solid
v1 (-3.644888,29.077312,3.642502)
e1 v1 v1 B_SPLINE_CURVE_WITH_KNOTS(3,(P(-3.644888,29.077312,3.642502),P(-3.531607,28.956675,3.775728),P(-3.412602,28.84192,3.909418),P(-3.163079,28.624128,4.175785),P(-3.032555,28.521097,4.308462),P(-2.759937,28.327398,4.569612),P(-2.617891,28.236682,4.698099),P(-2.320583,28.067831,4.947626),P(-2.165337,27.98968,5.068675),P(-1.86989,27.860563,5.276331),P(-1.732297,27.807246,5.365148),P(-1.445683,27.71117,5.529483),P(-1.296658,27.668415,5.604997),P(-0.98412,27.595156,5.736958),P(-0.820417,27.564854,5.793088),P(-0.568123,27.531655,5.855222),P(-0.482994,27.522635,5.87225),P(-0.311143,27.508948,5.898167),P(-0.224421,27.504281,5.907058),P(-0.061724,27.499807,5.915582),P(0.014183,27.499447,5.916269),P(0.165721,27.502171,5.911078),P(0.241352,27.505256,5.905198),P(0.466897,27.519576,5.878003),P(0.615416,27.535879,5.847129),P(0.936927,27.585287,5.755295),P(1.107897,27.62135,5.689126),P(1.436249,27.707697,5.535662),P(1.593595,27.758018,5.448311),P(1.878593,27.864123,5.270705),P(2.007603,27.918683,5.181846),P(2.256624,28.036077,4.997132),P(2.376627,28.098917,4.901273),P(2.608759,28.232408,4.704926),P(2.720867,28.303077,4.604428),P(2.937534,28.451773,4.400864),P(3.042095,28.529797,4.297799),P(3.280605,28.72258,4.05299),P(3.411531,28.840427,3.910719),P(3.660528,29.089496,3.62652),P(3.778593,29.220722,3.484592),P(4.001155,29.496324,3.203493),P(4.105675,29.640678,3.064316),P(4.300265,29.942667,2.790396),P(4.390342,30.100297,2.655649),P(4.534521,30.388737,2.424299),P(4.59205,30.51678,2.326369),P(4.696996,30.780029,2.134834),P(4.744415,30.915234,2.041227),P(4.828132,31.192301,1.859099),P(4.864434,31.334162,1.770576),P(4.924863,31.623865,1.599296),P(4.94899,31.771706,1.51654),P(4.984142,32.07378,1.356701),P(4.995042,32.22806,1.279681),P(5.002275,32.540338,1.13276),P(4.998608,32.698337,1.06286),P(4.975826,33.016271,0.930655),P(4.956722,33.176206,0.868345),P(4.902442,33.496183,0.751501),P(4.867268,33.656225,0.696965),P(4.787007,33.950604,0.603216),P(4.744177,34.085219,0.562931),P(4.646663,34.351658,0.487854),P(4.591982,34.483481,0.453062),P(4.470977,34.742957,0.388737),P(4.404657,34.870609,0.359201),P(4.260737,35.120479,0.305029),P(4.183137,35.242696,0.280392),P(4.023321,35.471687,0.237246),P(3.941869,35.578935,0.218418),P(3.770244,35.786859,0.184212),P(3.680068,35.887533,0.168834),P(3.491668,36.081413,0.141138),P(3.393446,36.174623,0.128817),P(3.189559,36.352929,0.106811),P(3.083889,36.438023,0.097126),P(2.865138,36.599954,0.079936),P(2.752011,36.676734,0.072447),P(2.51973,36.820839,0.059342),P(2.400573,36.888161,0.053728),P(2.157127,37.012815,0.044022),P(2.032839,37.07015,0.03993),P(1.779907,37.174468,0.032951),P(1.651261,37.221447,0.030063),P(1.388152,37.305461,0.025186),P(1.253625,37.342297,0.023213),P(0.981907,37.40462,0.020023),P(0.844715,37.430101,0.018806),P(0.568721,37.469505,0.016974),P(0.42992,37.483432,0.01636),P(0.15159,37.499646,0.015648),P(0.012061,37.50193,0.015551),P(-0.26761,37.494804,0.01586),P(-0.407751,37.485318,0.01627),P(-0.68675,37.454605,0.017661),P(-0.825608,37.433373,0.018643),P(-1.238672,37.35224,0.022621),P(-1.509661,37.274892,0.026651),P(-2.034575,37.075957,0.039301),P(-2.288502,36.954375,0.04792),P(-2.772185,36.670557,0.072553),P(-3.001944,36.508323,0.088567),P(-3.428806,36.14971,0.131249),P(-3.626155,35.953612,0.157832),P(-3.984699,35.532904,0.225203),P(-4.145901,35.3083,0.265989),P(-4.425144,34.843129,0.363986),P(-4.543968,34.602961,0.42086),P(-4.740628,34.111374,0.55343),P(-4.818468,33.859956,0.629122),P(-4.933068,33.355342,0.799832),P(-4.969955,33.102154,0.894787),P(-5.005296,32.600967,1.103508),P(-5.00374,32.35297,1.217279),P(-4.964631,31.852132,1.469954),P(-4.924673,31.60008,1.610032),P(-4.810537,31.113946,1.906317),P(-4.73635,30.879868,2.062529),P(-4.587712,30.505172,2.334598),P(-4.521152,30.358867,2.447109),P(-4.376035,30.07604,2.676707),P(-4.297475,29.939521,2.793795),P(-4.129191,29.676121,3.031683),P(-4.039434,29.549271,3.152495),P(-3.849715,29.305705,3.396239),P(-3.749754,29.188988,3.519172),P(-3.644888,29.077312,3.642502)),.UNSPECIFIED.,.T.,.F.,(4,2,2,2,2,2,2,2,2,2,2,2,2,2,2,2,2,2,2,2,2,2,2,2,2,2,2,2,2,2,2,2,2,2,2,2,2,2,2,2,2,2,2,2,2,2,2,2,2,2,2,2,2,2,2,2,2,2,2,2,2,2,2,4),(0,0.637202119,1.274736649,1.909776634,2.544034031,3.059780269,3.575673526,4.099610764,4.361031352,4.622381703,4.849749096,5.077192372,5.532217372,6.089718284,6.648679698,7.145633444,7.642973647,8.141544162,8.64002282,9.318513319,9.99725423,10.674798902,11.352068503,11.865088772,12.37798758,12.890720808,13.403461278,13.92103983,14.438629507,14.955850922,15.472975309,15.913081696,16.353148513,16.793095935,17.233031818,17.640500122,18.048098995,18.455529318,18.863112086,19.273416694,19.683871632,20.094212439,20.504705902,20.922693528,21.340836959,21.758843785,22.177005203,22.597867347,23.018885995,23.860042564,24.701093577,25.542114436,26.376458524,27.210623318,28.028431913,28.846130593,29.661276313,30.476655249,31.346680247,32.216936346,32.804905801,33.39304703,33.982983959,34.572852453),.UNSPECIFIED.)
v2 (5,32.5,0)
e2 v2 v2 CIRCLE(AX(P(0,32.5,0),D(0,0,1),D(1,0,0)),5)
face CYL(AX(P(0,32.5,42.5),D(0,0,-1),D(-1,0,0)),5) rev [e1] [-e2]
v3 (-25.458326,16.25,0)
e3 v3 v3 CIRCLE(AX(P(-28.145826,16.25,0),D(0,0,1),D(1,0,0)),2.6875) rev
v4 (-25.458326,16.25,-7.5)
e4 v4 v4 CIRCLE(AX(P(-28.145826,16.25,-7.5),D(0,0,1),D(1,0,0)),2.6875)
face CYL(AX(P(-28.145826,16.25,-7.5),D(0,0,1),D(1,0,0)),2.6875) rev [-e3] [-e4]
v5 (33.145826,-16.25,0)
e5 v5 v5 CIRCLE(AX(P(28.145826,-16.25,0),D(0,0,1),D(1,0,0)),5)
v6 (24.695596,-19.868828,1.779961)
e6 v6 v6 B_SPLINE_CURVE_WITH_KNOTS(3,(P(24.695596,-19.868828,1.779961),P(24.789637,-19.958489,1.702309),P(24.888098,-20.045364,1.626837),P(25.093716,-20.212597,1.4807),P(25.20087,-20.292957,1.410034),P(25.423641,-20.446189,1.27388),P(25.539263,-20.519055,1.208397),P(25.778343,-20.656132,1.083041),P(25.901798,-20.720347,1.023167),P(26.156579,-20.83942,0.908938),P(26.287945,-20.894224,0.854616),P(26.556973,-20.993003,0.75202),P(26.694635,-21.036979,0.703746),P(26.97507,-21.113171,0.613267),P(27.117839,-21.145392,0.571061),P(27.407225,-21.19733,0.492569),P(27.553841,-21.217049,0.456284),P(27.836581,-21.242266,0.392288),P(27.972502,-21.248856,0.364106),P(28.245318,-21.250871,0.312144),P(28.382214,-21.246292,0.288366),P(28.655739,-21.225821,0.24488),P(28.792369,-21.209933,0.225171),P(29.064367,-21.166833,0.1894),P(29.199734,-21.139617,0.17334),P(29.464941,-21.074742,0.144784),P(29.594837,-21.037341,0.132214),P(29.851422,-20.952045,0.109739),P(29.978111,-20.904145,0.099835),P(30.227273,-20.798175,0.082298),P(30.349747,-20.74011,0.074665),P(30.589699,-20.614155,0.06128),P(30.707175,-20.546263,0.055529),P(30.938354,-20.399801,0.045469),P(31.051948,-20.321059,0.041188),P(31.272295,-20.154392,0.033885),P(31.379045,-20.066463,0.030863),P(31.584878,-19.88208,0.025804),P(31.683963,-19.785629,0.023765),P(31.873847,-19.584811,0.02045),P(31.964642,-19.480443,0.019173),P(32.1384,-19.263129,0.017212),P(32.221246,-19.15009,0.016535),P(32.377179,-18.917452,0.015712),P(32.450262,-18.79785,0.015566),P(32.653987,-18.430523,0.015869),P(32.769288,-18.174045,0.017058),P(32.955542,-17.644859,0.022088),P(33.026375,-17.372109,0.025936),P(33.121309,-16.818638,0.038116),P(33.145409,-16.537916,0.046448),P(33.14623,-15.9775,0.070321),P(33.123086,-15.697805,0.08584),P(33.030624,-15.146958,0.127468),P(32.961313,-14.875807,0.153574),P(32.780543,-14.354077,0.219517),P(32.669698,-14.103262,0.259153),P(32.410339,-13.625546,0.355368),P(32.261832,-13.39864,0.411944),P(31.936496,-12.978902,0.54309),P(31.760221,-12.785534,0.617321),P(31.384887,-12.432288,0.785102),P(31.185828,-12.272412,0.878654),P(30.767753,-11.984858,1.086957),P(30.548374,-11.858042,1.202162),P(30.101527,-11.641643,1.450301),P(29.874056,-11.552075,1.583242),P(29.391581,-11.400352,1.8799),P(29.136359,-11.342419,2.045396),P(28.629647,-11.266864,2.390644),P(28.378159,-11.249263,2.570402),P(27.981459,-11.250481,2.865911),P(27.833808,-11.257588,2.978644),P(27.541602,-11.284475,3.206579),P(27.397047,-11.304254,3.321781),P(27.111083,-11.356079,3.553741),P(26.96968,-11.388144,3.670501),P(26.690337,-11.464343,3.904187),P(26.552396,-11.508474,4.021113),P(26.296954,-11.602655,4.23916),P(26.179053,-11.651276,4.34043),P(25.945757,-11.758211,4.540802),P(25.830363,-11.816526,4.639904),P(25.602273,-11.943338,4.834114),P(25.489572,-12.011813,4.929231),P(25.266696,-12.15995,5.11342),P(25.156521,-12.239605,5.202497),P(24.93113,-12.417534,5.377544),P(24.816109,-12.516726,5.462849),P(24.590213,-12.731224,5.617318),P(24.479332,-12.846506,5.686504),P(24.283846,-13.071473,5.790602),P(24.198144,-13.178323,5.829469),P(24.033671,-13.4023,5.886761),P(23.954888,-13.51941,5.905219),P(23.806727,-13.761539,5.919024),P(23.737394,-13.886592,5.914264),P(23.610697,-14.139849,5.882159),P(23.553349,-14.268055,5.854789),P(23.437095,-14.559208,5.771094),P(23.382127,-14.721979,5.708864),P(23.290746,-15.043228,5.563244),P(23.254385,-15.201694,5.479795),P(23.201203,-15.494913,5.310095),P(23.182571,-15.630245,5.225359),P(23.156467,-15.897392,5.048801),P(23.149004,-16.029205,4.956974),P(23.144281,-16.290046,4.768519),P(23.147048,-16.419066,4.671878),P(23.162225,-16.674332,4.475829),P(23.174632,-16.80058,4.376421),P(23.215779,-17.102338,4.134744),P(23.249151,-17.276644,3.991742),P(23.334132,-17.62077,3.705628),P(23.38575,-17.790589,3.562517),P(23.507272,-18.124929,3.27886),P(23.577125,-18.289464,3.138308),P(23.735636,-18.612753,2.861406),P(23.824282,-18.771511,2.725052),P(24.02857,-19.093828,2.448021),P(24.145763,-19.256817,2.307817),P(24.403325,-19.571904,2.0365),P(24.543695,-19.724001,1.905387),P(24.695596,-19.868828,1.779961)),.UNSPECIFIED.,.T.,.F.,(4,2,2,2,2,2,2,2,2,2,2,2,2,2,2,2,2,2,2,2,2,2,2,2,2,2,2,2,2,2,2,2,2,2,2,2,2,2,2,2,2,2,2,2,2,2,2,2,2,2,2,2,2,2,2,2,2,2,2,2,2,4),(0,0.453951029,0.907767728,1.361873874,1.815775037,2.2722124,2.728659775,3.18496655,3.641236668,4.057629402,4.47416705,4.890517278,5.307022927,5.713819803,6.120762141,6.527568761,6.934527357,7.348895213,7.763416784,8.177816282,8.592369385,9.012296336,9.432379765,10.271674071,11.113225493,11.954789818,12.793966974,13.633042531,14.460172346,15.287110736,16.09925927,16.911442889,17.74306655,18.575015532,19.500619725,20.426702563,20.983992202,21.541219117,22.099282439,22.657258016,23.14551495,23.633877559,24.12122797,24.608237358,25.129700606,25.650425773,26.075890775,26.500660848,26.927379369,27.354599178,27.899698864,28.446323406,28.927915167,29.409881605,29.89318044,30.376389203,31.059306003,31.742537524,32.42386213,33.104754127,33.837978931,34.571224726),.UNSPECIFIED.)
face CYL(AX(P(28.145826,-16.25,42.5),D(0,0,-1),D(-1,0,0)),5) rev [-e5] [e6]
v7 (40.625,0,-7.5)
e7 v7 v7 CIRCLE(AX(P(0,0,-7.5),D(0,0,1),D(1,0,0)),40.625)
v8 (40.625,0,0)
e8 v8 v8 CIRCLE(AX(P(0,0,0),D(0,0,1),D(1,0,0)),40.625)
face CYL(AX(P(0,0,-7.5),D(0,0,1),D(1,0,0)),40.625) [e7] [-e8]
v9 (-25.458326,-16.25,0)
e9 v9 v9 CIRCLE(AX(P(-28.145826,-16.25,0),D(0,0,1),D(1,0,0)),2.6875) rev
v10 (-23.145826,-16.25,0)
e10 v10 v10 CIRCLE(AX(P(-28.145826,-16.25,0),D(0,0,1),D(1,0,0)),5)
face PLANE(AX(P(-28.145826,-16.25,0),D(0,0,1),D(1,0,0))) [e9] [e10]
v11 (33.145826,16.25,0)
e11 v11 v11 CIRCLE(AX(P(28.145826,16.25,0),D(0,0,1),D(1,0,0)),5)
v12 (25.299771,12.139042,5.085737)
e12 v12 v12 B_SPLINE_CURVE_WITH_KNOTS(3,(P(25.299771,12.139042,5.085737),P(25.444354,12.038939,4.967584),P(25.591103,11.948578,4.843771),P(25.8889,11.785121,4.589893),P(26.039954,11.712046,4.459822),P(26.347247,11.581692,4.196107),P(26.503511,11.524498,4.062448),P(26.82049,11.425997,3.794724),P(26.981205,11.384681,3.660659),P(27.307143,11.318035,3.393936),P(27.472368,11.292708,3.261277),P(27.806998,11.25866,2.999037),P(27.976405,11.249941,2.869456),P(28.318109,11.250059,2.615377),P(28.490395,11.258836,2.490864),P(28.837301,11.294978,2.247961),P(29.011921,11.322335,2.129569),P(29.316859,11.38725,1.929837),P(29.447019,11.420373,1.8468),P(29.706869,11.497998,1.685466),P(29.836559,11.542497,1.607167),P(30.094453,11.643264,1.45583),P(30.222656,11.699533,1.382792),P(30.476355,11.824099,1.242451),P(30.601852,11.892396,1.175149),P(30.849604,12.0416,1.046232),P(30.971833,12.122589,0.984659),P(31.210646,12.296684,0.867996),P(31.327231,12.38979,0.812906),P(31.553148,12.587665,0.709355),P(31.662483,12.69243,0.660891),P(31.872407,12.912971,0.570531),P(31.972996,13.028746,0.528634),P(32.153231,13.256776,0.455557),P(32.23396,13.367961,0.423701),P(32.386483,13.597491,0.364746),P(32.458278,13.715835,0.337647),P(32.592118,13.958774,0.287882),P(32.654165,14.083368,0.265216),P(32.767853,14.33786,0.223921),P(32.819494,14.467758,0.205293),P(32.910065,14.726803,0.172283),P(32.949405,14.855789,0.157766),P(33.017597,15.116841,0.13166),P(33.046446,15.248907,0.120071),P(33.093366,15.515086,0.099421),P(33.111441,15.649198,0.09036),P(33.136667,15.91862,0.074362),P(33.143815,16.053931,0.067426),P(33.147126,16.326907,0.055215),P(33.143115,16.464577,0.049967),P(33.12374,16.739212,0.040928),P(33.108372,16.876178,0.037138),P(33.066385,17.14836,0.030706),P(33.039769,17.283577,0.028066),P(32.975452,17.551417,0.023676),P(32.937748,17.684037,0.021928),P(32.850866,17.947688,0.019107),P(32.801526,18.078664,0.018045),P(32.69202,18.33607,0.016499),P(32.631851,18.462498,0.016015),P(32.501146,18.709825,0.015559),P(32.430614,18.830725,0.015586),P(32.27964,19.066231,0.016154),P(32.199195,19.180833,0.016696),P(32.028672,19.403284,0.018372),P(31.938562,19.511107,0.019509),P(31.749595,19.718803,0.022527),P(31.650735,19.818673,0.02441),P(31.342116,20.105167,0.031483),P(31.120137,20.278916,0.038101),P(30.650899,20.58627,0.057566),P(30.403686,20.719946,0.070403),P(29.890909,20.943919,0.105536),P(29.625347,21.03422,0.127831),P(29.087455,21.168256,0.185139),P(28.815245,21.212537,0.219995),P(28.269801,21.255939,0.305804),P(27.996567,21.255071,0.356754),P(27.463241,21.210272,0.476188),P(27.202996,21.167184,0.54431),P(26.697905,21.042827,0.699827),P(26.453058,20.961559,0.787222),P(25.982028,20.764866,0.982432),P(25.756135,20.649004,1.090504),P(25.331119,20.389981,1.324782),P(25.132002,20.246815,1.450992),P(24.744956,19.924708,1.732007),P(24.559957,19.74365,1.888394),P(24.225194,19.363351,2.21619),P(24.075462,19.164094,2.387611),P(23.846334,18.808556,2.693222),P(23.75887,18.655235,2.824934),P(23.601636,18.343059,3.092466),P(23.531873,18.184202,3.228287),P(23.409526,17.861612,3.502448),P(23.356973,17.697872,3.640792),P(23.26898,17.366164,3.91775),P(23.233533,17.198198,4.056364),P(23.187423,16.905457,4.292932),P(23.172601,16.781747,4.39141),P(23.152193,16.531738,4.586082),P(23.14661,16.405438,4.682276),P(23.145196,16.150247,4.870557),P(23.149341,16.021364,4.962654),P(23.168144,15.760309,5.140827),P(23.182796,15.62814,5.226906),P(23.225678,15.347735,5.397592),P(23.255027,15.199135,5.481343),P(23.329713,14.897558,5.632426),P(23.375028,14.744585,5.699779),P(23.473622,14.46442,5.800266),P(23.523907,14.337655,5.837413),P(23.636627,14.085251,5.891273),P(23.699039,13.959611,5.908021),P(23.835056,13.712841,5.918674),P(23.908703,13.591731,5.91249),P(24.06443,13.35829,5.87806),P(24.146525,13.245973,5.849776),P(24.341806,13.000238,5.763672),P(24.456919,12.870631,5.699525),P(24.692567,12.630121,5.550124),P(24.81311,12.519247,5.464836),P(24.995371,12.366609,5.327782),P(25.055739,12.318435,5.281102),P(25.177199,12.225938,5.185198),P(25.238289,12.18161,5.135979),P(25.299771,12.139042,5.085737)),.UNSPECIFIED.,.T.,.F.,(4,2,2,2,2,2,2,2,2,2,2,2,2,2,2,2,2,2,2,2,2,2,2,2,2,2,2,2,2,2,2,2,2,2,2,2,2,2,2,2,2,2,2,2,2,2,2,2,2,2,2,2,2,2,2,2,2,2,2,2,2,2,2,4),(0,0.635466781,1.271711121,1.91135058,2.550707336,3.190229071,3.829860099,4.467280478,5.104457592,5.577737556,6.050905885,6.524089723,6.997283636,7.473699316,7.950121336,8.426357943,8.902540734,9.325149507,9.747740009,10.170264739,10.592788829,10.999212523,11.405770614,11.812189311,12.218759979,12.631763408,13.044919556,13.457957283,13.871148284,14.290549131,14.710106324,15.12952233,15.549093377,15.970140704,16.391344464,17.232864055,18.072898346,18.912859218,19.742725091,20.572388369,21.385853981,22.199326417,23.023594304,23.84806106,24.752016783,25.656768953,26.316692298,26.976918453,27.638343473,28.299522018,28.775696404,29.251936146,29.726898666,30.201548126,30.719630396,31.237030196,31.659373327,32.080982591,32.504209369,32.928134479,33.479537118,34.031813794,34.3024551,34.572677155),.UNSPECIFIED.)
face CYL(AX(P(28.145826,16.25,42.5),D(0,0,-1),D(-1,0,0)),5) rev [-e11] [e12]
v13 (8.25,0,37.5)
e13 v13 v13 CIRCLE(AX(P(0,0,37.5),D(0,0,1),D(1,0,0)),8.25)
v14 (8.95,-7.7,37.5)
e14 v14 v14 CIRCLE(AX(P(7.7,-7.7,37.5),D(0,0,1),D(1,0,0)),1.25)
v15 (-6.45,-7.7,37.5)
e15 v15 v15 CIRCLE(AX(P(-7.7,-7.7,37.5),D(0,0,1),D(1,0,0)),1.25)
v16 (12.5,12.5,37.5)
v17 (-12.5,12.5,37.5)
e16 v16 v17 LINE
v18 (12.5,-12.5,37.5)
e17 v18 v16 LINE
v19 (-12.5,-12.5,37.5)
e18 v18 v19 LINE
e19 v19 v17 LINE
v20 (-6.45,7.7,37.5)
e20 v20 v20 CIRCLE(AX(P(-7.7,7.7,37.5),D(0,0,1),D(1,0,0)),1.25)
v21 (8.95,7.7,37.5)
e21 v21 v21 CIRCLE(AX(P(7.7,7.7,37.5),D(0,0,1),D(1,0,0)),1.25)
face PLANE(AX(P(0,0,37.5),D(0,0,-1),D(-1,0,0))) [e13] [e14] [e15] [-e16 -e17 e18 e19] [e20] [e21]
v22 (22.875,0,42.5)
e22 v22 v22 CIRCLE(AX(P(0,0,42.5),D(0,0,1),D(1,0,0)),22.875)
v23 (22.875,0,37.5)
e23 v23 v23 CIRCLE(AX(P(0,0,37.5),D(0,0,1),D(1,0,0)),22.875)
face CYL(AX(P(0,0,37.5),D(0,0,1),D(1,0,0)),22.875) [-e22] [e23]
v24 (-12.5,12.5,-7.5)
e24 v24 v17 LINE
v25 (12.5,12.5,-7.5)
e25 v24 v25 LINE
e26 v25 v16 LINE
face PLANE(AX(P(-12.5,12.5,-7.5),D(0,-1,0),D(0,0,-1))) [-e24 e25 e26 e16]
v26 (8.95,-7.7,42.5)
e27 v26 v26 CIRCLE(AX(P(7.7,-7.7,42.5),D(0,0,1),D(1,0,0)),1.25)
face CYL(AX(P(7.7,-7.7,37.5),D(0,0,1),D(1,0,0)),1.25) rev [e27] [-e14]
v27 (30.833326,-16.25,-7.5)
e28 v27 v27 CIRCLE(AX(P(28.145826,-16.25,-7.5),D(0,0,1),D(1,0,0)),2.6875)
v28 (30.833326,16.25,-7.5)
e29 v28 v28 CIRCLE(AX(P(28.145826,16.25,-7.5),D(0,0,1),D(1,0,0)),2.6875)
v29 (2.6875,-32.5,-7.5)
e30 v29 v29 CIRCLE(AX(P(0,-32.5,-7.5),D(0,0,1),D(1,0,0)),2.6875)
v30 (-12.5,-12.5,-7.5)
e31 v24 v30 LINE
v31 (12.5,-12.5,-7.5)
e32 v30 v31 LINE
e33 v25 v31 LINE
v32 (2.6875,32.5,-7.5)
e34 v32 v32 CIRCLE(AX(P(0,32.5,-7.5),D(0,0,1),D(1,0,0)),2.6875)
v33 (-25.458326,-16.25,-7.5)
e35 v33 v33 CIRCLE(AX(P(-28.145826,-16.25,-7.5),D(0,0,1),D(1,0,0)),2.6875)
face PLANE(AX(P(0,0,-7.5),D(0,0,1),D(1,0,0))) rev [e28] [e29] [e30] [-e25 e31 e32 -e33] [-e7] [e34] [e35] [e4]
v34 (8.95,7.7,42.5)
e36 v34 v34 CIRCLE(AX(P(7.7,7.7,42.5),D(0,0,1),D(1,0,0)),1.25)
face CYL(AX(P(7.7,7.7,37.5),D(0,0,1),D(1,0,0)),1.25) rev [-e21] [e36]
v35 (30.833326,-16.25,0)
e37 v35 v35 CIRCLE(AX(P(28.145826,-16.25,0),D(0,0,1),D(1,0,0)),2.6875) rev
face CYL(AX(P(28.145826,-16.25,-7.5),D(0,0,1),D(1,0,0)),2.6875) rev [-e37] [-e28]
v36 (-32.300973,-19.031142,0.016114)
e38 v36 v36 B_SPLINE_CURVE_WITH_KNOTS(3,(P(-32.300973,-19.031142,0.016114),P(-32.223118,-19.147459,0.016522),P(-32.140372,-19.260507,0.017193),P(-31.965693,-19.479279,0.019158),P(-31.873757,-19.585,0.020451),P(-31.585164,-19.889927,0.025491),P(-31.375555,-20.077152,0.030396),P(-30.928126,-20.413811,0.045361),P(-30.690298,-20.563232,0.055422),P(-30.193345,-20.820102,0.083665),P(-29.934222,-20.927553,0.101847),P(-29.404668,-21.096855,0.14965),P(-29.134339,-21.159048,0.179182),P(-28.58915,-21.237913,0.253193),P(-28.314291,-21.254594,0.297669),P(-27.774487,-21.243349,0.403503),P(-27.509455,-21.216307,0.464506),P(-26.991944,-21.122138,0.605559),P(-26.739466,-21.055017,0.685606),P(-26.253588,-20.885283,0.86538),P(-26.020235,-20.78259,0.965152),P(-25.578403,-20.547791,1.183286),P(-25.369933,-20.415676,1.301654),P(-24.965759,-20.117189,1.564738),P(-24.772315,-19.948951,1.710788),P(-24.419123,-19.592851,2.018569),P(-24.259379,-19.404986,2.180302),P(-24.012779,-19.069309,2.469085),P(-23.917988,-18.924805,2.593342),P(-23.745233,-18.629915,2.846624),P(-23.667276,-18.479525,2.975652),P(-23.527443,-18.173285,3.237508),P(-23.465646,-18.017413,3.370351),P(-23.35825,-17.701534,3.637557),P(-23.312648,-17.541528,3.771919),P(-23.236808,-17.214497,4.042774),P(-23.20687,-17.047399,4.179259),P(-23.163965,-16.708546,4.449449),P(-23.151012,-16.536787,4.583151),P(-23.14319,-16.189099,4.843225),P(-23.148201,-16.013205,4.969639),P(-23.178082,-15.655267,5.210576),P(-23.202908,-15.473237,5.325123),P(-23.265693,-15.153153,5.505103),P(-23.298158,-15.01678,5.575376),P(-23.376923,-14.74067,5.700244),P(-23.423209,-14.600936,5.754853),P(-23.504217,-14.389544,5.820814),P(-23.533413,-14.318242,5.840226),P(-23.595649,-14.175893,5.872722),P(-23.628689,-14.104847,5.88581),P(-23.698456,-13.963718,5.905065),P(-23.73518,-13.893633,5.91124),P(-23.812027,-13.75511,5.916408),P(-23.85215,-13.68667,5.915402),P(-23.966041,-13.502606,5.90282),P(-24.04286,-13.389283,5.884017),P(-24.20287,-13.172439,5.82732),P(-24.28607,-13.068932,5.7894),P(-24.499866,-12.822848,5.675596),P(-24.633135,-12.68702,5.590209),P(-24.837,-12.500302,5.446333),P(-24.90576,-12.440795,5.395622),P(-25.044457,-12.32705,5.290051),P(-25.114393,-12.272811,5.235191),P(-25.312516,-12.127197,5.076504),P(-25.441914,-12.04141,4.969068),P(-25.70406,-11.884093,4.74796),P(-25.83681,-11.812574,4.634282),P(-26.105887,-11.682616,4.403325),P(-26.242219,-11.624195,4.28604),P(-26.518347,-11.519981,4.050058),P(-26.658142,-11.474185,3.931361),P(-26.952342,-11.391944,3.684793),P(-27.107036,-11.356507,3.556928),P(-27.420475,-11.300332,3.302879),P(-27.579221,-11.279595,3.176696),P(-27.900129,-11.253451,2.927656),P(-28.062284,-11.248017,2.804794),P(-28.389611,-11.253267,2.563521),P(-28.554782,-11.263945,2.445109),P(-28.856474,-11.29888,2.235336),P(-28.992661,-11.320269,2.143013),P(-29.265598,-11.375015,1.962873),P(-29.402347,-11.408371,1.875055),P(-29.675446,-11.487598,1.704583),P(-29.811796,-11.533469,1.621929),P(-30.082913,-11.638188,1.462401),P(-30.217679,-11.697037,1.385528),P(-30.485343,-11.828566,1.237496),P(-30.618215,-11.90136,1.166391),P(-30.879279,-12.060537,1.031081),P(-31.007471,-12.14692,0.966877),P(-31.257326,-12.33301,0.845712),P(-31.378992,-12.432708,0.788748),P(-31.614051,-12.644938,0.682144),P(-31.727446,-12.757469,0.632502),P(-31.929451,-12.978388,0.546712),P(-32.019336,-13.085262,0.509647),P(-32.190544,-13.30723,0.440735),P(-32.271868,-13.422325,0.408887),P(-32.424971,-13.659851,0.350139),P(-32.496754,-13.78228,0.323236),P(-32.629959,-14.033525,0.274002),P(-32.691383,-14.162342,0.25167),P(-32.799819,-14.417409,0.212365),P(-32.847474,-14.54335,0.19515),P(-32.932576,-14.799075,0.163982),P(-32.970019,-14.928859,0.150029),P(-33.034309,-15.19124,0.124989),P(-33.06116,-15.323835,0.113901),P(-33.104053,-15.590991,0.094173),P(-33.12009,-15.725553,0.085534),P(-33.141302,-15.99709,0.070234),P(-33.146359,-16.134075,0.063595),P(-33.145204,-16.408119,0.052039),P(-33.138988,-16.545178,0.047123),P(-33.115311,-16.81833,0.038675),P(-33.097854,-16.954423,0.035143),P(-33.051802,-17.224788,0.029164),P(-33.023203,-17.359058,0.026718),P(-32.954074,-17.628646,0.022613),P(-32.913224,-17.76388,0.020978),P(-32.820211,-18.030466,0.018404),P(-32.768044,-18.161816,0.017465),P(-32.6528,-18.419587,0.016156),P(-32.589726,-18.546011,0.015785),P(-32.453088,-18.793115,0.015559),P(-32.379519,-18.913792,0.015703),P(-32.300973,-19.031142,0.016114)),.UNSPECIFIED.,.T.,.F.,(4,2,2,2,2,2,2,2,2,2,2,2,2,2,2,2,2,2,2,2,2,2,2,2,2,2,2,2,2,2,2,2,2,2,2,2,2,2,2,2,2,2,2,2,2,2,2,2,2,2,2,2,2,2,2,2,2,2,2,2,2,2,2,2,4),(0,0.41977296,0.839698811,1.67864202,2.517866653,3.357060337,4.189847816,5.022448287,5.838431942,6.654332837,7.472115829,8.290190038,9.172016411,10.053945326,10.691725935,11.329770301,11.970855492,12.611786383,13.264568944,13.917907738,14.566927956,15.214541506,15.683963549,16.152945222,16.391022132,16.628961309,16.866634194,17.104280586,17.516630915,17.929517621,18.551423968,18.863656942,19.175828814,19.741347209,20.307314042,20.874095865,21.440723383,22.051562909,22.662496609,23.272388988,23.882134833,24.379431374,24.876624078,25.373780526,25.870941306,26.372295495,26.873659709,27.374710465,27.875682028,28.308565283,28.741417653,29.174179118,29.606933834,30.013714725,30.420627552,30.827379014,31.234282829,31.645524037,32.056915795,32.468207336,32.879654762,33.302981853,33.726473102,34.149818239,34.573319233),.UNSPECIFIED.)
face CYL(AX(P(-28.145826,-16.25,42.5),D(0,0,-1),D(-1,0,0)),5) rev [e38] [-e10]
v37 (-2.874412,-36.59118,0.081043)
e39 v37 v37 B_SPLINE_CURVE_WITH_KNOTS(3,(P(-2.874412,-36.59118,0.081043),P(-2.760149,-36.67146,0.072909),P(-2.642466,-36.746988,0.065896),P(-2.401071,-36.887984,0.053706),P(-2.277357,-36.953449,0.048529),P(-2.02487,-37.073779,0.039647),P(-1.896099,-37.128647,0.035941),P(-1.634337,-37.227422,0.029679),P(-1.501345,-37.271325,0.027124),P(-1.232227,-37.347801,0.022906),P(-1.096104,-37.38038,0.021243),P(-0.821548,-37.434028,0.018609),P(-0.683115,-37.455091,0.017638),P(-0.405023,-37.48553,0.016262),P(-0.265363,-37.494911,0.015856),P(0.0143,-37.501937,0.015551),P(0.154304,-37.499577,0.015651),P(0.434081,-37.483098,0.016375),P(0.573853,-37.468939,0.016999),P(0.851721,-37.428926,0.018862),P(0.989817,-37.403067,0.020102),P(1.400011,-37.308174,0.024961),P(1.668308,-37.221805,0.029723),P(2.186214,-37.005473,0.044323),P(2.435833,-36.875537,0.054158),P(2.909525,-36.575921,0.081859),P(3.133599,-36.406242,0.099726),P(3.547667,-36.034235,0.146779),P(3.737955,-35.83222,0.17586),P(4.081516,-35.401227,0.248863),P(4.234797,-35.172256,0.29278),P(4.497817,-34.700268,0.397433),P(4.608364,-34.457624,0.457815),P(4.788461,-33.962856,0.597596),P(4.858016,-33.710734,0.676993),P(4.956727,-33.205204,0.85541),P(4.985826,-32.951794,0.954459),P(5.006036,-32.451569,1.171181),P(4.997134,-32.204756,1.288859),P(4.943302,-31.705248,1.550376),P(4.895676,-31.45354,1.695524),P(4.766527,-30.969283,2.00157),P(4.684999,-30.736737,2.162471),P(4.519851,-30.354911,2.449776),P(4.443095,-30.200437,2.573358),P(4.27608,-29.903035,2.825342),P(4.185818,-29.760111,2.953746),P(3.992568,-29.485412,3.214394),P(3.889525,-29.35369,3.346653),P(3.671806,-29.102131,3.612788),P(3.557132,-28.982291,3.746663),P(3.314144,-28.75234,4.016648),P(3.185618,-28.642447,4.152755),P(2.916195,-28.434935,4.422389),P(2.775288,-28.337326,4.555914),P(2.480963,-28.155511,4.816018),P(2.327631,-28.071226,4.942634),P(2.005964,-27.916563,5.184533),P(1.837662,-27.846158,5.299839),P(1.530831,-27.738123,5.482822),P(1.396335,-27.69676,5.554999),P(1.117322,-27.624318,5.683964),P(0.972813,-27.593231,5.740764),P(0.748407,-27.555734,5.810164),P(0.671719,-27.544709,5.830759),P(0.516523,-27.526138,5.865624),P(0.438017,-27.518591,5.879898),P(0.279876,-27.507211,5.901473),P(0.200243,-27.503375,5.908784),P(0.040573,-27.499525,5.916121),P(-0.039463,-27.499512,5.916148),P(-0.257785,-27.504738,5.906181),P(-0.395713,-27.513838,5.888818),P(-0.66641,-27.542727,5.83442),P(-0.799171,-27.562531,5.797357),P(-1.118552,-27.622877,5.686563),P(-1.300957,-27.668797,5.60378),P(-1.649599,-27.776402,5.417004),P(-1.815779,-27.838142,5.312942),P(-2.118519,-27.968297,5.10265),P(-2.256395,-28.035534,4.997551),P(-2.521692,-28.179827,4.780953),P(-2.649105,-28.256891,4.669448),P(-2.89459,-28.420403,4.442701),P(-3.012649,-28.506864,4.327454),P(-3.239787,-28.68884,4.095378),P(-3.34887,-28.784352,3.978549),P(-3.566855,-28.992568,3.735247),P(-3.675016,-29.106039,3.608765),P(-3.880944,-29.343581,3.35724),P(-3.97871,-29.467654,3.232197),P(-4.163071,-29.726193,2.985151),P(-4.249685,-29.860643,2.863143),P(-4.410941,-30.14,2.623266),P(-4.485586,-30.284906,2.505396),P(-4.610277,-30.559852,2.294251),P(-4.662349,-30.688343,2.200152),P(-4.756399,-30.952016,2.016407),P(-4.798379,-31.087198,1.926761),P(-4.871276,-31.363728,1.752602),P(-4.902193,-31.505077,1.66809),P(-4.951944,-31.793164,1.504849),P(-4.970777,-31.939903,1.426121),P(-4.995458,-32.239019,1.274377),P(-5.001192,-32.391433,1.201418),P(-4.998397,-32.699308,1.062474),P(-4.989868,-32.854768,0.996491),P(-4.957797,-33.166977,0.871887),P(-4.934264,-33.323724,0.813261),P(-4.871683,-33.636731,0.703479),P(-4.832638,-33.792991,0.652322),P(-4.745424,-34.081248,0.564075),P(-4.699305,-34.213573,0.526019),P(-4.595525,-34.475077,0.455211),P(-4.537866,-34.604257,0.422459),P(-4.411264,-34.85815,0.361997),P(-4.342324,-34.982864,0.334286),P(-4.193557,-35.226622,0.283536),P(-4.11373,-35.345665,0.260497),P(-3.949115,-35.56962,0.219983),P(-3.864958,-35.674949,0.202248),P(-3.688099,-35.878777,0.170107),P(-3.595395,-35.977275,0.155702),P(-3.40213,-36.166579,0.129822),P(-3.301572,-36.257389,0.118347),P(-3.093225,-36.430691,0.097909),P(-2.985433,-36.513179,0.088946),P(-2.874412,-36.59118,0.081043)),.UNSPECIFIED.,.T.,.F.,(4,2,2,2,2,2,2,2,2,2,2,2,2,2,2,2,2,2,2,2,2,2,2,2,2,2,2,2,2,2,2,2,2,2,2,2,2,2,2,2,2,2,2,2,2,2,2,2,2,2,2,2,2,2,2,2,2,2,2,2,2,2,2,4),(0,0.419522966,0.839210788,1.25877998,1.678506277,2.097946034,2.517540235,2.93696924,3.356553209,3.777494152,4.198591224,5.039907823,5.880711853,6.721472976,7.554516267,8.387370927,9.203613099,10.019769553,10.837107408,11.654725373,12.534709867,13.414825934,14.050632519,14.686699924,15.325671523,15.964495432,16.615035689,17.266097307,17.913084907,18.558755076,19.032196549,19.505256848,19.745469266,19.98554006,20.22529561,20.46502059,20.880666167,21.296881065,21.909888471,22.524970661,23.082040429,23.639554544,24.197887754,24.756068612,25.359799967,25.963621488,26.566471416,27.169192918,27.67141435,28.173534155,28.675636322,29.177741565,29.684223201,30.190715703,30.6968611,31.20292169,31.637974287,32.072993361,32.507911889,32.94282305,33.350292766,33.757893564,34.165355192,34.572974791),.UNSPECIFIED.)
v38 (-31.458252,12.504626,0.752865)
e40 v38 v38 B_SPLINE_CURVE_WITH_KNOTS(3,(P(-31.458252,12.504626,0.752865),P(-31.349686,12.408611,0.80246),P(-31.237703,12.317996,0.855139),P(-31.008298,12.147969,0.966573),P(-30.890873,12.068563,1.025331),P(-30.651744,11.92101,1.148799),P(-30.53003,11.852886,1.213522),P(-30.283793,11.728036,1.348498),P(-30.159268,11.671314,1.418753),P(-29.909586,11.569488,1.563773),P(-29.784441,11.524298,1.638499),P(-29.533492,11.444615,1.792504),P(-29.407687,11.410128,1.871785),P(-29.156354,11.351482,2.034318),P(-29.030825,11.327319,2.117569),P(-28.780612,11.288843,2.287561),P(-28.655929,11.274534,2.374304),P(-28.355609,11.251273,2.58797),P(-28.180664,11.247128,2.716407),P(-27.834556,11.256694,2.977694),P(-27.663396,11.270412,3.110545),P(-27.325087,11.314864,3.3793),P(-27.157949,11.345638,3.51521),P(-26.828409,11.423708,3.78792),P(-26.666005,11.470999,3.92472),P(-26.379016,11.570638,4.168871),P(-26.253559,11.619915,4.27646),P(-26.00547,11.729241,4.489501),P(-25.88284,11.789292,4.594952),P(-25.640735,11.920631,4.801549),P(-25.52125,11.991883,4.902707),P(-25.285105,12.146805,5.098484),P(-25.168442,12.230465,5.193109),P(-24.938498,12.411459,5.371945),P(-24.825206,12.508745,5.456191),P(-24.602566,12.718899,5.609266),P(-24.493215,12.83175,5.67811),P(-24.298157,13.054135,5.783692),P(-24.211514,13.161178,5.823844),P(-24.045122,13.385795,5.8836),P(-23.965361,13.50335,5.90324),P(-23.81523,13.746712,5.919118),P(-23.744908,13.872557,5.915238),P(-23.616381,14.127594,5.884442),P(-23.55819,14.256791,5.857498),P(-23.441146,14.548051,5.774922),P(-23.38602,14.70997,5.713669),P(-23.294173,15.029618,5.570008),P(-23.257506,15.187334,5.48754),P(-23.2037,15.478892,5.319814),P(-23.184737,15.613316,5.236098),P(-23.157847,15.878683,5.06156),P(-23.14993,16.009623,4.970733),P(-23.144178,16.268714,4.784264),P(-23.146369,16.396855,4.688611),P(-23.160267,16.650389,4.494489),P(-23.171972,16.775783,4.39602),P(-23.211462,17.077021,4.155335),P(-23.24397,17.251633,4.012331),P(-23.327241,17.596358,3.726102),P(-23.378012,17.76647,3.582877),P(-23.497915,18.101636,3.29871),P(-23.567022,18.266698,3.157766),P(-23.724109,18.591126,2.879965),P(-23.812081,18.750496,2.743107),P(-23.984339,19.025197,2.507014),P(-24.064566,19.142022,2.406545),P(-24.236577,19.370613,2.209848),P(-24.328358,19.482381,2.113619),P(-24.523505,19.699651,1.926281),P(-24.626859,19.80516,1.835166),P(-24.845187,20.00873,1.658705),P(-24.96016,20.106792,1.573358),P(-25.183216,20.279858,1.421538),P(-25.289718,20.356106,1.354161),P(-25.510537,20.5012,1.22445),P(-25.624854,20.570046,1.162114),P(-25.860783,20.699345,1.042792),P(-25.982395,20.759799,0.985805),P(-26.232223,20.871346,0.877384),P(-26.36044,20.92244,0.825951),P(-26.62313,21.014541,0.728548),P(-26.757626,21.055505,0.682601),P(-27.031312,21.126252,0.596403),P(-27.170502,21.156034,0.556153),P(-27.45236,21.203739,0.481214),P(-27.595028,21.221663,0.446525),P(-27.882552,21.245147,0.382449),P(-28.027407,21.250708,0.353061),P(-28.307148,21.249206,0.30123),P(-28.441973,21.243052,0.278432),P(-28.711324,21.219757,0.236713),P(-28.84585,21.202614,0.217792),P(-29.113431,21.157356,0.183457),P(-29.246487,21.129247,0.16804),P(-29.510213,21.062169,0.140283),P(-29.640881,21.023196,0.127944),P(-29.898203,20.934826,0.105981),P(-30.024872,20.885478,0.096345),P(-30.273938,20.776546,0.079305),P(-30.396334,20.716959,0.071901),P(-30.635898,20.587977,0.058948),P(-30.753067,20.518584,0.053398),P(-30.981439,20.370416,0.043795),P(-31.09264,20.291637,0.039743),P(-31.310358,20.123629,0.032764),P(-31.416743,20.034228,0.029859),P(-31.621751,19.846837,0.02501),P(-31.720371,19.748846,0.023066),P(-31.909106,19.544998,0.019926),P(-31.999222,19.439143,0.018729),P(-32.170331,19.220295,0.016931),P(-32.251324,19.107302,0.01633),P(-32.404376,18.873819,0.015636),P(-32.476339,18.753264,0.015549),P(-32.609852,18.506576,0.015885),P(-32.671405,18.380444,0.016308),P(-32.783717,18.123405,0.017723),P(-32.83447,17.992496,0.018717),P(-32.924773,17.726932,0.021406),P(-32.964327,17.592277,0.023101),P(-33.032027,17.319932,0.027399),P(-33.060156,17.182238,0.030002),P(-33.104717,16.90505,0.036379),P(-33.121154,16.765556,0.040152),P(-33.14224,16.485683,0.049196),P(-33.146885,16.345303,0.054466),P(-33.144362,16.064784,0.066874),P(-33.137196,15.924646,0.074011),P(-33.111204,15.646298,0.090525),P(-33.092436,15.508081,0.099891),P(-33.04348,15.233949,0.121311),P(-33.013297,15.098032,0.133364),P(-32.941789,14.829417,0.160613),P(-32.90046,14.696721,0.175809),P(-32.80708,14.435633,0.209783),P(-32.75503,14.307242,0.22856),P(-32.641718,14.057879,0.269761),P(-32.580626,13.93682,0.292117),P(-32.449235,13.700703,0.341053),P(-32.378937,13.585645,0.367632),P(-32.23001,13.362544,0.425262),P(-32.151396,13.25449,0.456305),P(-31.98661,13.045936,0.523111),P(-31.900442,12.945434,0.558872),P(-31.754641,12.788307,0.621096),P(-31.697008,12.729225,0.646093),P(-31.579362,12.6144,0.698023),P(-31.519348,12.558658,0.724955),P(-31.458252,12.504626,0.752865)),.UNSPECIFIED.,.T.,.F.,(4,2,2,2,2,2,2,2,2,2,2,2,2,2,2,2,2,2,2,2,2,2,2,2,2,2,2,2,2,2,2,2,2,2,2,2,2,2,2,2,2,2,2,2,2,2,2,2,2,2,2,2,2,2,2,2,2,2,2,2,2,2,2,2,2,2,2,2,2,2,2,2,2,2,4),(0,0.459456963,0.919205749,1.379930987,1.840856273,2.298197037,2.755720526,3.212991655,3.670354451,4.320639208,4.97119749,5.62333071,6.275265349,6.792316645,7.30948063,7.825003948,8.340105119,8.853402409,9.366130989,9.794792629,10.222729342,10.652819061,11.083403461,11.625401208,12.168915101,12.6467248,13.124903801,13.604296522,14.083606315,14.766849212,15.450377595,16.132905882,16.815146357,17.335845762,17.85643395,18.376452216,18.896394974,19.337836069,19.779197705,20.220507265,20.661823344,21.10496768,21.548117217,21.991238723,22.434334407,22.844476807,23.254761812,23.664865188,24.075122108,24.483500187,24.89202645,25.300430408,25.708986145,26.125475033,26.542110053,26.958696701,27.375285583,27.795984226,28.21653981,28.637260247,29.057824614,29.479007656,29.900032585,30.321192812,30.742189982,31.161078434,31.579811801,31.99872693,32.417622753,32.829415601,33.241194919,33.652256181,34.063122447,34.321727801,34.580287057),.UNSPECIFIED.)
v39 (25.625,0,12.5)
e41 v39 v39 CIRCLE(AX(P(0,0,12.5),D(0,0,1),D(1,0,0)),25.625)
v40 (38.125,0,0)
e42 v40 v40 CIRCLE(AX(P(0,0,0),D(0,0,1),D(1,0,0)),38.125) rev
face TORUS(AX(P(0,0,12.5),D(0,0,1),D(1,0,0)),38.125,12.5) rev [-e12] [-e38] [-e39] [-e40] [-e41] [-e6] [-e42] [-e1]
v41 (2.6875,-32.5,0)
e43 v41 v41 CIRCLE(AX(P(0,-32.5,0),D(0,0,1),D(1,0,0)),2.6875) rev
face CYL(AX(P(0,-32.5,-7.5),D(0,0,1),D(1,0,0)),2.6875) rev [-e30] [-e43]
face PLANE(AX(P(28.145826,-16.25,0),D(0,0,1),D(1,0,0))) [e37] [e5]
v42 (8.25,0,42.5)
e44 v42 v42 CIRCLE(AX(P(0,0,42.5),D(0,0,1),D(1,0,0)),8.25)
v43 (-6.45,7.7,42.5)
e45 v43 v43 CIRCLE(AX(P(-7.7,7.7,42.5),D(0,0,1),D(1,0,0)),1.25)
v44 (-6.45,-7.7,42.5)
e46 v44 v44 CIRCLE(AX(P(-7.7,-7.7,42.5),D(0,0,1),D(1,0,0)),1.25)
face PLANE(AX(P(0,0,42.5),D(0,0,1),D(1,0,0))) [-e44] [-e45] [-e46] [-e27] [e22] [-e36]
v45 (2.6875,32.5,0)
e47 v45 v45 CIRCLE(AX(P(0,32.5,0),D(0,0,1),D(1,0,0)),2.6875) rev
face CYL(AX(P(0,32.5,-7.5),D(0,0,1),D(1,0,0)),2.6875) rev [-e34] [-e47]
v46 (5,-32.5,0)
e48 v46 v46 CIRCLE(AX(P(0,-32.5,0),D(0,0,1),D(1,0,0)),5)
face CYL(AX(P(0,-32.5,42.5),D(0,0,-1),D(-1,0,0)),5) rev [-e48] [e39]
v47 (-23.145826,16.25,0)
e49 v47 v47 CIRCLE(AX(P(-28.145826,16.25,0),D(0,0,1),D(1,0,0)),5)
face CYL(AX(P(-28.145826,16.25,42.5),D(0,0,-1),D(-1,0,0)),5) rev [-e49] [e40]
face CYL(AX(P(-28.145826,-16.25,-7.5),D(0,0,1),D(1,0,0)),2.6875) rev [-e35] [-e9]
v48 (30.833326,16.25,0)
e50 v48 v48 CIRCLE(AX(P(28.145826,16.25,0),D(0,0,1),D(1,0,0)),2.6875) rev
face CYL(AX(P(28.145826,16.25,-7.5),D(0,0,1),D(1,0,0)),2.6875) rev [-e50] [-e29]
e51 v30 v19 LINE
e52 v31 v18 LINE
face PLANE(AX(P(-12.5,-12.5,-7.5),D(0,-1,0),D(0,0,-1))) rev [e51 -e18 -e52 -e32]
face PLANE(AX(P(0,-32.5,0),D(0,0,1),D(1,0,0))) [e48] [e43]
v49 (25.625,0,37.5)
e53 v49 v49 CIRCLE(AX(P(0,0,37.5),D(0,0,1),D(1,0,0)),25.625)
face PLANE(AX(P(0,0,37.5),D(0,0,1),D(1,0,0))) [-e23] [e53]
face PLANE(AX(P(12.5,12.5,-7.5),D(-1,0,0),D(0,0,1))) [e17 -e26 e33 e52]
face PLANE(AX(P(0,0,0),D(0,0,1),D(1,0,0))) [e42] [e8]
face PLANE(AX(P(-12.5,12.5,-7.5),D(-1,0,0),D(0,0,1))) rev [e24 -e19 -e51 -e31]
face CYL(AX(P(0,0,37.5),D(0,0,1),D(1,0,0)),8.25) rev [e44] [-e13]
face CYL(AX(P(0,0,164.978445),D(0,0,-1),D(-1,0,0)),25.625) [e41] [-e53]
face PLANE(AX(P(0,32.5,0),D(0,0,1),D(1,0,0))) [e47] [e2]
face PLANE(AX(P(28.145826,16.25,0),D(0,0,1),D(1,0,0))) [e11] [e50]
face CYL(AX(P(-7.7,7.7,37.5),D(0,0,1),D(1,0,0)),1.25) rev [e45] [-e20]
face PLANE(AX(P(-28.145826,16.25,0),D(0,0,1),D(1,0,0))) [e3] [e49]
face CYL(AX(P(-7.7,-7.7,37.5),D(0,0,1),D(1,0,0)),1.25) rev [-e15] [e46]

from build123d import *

# Parameters (mm, degrees)
SKETCH1_R           = 40.625
SKETCH1_R_2         = 2.6875
SKETCH1_W           = 25
SKETCH1_H           = 25
BOSS_EXTRUDE1_DEPTH = 7.5
SKETCH1_3_R         = 25.625
SKETCH1_3_W         = 25
SKETCH1_3_H         = 25
BOSS_EXTRUDE2_DEPTH = 42.5
FILLET2_2_OUTLINE_R = 2.6875
FILLET2_2_DEPTH     = 3.164444439
SKETCH1_4_R         = 5
CUT_EXTRUDE1_DEPTH  = 72.463495926
BOSS_EXTRUDE3_START = 42.5
SKETCH1_5_W         = 25
SKETCH1_5_H         = 25
SKETCH1_5_R         = 1.25
SKETCH1_5_R_2       = 8.25
BOSS_EXTRUDE3_DEPTH = 5
CUT_EXTRUDE2_START  = 37.5
SKETCH1_6_R         = 25.625
SKETCH1_6_R_2       = 22.875
CUT_EXTRUDE2_DEPTH  = 5


with BuildPart() as part:
    # Sketch1 → Boss-Extrude1 (new body)
    with BuildSketch(Plane.XY):
        Circle(SKETCH1_R)
        with Locations((0, 32.5)):
            Circle(SKETCH1_R_2, mode=Mode.SUBTRACT)
        with Locations((28.145825623, 16.25)):
            Circle(SKETCH1_R_2, mode=Mode.SUBTRACT)
        with Locations((28.145825623, -16.25)):
            Circle(SKETCH1_R_2, mode=Mode.SUBTRACT)
        with Locations((0, -32.5)):
            Circle(SKETCH1_R_2, mode=Mode.SUBTRACT)
        with Locations((-28.145825623, -16.25)):
            Circle(SKETCH1_R_2, mode=Mode.SUBTRACT)
        with Locations((-28.145825623, 16.25)):
            Circle(SKETCH1_R_2, mode=Mode.SUBTRACT)
        Rectangle(SKETCH1_W, SKETCH1_H, mode=Mode.SUBTRACT)
    extrude(amount=-BOSS_EXTRUDE1_DEPTH)

    # Sketch1<3> → Boss-Extrude2 (add)
    with BuildSketch(Plane.XY):
        Circle(SKETCH1_3_R)
        Rectangle(SKETCH1_3_W, SKETCH1_3_H, mode=Mode.SUBTRACT)
    extrude(amount=BOSS_EXTRUDE2_DEPTH)

    # Fillet2: read off the stored shape, not the designer's step
    # Fillet2 outline → Fillet2 (revolve)
    with BuildSketch(Plane.XZ):
        with BuildLine():
            ThreePointArc((38.125, 0), (29.286165235, 3.661165235), (25.625, 12.5))
            Line((25.625, 12.5), (25.625, 0))
            Line((25.625, 0), (38.125, 0))
        make_face()
    revolve(axis=Axis((0, 0, 0), (0, 0, 1)))

    # Fillet2 2 outline → Fillet2 2 (cut)
    with BuildSketch(Plane.XY):
        with Locations((0, 32.5)):
            Circle(FILLET2_2_OUTLINE_R)
        with Locations((-28.145825623, 16.25)):
            Circle(FILLET2_2_OUTLINE_R)
        with Locations((28.145825623, 16.25)):
            Circle(FILLET2_2_OUTLINE_R)
        with Locations((-28.145825623, -16.25)):
            Circle(FILLET2_2_OUTLINE_R)
        with Locations((0, -32.5)):
            Circle(FILLET2_2_OUTLINE_R)
        with Locations((28.145825623, -16.25)):
            Circle(FILLET2_2_OUTLINE_R)
    extrude(amount=FILLET2_2_DEPTH, mode=Mode.SUBTRACT)

    # Sketch1<4> → Cut-Extrude1 (cut, through all)
    with BuildSketch(Plane.XY):
        with Locations(Location((0, 32.5, 0), (0, 0, 223.199248812))):
            Circle(SKETCH1_4_R)
        with Locations(Location((28.145825623, 16.25, 0), (0, 0, 235.304779613))):
            Circle(SKETCH1_4_R)
        with Locations(Location((-28.145825623, 16.25, 0), (0, 0, 228.510303159))):
            Circle(SKETCH1_4_R)
        with Locations(Location((-28.145825623, -16.25, 0), (0, 0, 213.795366165))):
            Circle(SKETCH1_4_R)
        with Locations(Location((0, -32.5, 0), (0, 0, 234.908607799))):
            Circle(SKETCH1_4_R)
        with Locations(Location((28.145825623, -16.25, 0), (0, 0, 226.366250756))):
            Circle(SKETCH1_4_R)
    extrude(amount=CUT_EXTRUDE1_DEPTH, mode=Mode.SUBTRACT)

    # Sketch1<5> → Boss-Extrude3 (add)
    with BuildSketch(Plane.XY.offset(BOSS_EXTRUDE3_START)):
        Rectangle(SKETCH1_5_W, SKETCH1_5_H)
        with Locations((-7.7, -7.7)):
            Circle(SKETCH1_5_R, mode=Mode.SUBTRACT)
        with Locations((7.7, -7.7)):
            Circle(SKETCH1_5_R, mode=Mode.SUBTRACT)
        with Locations((7.7, 7.7)):
            Circle(SKETCH1_5_R, mode=Mode.SUBTRACT)
        with Locations((-7.7, 7.7)):
            Circle(SKETCH1_5_R, mode=Mode.SUBTRACT)
        Circle(SKETCH1_5_R_2, mode=Mode.SUBTRACT)
    extrude(amount=-BOSS_EXTRUDE3_DEPTH)

    # Sketch1<6> → Cut-Extrude2 (cut)
    with BuildSketch(Plane.XY.offset(CUT_EXTRUDE2_START)):
        Circle(SKETCH1_6_R)
        Circle(SKETCH1_6_R_2, mode=Mode.SUBTRACT)
    extrude(amount=CUT_EXTRUDE2_DEPTH, mode=Mode.SUBTRACT)


solid = part.part
